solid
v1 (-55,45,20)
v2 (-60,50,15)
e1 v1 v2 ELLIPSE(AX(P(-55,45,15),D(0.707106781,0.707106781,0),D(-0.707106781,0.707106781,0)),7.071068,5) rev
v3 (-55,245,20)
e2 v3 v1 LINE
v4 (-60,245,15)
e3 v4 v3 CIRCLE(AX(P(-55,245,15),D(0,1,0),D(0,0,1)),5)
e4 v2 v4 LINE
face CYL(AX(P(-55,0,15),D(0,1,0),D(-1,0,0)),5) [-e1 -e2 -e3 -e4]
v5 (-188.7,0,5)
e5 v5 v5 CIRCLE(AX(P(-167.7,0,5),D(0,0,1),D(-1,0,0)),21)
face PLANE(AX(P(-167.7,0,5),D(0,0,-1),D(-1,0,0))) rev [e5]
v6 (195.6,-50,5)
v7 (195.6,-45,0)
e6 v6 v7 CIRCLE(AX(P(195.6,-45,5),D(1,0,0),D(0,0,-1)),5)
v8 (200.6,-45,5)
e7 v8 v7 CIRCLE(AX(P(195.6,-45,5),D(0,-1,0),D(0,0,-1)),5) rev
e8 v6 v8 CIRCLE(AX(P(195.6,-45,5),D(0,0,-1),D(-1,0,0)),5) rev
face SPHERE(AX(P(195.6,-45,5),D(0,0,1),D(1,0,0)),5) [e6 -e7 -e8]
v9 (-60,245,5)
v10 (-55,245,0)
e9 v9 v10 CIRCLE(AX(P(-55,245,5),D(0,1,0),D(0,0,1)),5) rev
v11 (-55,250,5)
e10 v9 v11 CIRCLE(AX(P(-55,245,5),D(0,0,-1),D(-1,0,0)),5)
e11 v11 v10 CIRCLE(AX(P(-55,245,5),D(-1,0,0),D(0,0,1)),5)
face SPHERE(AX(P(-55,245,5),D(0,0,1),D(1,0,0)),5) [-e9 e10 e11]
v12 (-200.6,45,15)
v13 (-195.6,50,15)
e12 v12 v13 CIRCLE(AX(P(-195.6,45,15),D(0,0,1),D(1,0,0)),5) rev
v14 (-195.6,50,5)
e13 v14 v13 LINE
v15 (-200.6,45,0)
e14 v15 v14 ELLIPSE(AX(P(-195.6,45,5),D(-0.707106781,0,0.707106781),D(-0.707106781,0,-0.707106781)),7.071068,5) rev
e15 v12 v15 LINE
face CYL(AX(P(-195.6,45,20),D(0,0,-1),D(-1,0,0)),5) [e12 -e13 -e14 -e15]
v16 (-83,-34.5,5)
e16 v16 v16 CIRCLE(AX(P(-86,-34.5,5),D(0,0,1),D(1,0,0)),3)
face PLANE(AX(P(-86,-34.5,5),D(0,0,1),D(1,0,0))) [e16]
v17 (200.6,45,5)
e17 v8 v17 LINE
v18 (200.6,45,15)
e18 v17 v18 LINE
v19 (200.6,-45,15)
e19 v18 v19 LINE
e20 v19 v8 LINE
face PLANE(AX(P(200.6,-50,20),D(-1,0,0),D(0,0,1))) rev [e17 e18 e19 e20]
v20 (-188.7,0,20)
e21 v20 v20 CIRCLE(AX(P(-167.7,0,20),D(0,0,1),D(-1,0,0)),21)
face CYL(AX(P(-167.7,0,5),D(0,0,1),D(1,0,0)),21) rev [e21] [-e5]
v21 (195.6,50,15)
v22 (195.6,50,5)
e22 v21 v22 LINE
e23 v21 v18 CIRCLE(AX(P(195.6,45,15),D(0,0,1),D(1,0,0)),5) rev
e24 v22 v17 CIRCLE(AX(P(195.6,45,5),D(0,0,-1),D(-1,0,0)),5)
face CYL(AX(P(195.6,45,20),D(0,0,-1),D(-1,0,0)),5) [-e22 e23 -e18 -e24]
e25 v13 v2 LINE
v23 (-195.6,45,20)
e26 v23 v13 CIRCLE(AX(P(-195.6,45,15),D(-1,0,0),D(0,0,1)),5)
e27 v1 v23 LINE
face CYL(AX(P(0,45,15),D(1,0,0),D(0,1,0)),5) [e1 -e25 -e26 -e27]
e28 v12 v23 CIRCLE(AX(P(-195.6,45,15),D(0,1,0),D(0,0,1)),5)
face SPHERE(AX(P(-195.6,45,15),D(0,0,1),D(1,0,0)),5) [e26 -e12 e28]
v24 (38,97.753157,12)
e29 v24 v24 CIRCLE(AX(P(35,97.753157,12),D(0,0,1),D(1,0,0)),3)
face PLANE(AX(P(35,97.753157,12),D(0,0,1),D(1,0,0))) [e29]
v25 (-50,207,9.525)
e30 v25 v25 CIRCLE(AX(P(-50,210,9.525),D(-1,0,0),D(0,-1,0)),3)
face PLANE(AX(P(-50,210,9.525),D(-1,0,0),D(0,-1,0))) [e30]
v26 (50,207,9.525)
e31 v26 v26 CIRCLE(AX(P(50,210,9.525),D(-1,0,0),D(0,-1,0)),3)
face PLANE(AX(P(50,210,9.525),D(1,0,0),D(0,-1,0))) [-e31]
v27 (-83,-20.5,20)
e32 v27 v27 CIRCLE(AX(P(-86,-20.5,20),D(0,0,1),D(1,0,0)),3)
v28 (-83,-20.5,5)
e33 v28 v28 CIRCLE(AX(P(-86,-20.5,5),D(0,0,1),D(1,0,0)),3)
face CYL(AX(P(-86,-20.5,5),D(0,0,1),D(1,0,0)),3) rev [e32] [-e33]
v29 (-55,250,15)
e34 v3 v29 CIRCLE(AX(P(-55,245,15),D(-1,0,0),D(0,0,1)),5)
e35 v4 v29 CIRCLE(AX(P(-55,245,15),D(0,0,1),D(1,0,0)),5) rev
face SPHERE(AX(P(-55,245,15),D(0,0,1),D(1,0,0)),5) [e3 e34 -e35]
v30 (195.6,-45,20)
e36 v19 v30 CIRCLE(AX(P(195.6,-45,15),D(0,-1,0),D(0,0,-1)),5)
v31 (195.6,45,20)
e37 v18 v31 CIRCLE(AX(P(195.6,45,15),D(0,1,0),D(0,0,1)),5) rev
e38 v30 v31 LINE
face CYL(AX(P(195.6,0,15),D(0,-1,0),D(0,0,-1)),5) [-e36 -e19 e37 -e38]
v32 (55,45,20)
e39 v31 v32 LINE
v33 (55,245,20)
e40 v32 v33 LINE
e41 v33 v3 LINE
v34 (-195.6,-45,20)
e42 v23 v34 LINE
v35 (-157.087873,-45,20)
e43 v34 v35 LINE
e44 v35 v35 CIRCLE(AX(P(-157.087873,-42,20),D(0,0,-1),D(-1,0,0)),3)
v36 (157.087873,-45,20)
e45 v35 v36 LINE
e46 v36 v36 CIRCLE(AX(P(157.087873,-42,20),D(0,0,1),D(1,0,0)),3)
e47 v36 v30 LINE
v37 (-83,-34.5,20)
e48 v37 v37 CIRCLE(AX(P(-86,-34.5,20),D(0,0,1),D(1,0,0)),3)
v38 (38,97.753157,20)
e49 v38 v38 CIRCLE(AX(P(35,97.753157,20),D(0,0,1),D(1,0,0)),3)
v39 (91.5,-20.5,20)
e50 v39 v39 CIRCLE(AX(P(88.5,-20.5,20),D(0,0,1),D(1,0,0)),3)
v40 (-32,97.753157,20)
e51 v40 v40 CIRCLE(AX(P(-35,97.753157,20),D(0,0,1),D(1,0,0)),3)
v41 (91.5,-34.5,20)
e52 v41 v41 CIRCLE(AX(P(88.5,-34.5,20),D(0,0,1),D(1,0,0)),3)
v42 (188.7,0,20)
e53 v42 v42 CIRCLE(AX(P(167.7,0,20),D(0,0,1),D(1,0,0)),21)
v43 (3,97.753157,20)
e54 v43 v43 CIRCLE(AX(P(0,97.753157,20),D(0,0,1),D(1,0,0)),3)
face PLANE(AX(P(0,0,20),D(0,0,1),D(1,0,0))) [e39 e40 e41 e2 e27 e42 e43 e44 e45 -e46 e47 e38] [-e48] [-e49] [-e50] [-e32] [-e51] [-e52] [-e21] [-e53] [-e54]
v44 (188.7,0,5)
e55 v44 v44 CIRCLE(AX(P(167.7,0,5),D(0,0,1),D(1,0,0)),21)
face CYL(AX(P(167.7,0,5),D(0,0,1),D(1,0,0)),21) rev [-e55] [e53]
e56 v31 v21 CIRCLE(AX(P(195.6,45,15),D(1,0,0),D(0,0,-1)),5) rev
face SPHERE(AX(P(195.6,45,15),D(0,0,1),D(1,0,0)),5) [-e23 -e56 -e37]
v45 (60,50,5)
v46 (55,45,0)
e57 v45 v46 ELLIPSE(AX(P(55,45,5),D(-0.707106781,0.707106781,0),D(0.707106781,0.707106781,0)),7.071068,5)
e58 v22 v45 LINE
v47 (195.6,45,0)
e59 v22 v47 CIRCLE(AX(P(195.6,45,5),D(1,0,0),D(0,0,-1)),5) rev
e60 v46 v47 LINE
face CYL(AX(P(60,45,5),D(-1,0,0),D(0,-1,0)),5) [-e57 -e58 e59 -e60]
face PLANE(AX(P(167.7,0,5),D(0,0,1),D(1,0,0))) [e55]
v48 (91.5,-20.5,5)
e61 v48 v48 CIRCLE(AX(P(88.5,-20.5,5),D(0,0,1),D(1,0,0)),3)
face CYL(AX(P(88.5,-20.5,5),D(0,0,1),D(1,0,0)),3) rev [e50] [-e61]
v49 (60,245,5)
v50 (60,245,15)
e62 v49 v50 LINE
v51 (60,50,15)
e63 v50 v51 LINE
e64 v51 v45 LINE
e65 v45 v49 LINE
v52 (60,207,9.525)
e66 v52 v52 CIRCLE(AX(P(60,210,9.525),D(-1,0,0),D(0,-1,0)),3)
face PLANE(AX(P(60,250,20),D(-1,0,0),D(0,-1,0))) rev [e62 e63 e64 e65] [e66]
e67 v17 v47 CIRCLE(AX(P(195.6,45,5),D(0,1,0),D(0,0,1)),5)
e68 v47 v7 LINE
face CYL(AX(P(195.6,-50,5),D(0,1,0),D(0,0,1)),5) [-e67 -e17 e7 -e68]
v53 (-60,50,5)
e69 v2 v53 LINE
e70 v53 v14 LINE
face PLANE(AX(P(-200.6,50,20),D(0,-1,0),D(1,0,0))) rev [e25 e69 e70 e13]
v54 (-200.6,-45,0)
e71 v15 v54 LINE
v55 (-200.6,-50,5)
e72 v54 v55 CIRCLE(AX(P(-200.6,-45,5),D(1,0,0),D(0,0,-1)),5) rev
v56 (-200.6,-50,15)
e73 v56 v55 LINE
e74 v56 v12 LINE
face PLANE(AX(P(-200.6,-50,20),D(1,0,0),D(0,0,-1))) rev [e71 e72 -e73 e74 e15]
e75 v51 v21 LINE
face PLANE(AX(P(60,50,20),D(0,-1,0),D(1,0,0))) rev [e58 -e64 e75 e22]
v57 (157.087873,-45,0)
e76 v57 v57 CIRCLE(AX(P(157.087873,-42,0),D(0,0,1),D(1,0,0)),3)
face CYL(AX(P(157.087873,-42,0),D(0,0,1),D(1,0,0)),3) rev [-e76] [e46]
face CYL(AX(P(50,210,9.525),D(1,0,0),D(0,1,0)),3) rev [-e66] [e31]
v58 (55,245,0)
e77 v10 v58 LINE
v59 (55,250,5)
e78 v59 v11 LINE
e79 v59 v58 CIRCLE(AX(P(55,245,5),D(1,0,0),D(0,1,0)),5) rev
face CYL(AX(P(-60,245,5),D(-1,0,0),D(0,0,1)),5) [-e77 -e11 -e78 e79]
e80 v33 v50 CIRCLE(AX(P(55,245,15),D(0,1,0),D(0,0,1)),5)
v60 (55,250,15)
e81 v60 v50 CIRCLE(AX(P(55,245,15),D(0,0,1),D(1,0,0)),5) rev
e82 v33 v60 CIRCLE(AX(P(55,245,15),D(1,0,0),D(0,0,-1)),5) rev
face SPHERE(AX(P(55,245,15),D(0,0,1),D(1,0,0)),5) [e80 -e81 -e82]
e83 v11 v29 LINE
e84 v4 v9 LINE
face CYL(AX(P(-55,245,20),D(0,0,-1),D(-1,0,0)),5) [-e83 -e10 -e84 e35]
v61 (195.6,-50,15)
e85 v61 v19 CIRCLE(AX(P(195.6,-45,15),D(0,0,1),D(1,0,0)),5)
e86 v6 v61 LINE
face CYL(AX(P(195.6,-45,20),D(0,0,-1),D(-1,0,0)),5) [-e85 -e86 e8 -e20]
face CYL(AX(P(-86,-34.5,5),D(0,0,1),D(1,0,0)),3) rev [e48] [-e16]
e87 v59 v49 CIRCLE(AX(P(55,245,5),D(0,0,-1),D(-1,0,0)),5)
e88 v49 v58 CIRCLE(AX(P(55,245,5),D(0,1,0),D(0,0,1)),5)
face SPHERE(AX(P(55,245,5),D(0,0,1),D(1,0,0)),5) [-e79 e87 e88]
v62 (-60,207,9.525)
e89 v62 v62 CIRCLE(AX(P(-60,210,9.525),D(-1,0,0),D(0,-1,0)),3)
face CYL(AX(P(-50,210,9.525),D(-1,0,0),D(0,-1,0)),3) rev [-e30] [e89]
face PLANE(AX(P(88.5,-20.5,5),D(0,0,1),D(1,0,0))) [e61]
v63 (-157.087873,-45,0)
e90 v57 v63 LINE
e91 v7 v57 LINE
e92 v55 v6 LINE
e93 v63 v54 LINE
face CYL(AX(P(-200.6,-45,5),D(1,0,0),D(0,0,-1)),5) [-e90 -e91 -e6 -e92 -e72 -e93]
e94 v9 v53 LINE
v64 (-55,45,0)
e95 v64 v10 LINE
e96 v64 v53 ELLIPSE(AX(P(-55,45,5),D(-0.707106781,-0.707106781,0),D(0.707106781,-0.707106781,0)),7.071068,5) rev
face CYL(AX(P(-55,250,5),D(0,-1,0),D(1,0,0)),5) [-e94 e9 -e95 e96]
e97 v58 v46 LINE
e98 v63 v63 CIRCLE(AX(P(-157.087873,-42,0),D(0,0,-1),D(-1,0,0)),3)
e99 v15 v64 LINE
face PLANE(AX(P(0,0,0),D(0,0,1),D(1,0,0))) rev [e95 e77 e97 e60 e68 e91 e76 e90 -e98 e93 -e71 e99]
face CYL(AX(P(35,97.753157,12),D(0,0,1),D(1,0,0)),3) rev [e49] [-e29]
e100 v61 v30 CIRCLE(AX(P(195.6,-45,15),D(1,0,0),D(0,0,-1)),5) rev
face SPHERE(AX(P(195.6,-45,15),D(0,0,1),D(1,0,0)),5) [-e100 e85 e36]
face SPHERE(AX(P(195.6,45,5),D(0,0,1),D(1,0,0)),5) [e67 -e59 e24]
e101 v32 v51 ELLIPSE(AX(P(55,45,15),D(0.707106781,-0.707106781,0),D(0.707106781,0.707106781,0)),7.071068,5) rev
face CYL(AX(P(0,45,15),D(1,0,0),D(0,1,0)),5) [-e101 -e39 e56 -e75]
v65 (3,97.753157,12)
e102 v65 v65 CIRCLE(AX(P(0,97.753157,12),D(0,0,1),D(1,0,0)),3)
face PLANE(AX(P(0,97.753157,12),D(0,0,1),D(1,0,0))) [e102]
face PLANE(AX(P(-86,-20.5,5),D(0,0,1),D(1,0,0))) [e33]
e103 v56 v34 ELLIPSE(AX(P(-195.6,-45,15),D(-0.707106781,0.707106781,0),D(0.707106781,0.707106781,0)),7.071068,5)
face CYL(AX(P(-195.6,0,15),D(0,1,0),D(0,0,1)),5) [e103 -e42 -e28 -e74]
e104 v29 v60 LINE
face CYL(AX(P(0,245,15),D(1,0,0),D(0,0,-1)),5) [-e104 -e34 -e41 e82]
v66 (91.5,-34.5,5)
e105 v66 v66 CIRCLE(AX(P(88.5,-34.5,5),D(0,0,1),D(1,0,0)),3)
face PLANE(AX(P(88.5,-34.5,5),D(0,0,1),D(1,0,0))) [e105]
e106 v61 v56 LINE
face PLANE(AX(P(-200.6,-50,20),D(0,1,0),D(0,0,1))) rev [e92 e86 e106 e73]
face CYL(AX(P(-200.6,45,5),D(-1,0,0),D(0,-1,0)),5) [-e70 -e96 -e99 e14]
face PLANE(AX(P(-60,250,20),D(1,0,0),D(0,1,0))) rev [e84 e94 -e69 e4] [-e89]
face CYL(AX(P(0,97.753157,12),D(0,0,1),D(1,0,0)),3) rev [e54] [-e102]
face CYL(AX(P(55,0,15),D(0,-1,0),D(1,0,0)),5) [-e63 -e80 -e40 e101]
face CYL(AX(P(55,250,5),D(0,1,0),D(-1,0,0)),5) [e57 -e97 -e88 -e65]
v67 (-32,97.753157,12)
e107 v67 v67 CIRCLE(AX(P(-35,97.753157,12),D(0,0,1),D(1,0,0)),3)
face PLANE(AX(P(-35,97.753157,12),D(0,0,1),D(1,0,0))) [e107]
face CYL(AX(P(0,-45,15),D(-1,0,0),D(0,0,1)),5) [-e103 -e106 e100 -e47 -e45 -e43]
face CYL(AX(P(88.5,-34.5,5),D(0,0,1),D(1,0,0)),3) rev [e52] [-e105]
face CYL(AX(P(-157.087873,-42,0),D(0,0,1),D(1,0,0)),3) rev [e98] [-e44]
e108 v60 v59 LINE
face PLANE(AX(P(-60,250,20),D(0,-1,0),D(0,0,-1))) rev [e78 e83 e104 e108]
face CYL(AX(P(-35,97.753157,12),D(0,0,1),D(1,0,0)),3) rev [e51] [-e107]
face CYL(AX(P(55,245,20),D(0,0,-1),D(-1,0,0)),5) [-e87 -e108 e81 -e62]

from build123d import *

# Parameters (mm, degrees)
BOSS_EXTRUDE1_DEPTH = 20
SKETCH2_R           = 21
CUT_EXTRUDE1_DEPTH  = 15
SKETCH3_R           = 3
CUT_EXTRUDE2_DEPTH  = 8
SKETCH4_R           = 3
CUT_EXTRUDE3_DEPTH  = 15
SKETCH5_R           = 3
CUT_EXTRUDE4_DEPTH  = 20
FILLET1_R           = 5
SKETCH6_R           = 3
CUT_EXTRUDE7_DEPTH  = 10


with BuildPart() as part:
    # Sketch1 → Boss-Extrude1 (new body)
    with BuildSketch(Plane.XY):
        Polygon((-200.6, -50), (200.6, -50), (200.6, 50), (60, 50), (60, 250), (-60, 250), (-60, 50), (-200.6, 50), align=None)
    extrude(amount=BOSS_EXTRUDE1_DEPTH)

    # Sketch2 → Cut-Extrude1 (cut)
    with BuildSketch(Plane.XY.offset(20)):
        with Locations((167.7, 0)):
            Circle(SKETCH2_R)
        with Locations(Location((-167.7, 0, 0), (0, 0, 180))):
            Circle(SKETCH2_R)
    extrude(amount=-CUT_EXTRUDE1_DEPTH, mode=Mode.SUBTRACT)

    # Sketch3 → Cut-Extrude2 (cut)
    with BuildSketch(Plane.XY.offset(20)):
        with Locations((-35, 97.753157488)):
            Circle(SKETCH3_R)
        with Locations((35, 97.753157488)):
            Circle(SKETCH3_R)
        with Locations((0, 97.753157488)):
            Circle(SKETCH3_R)
    extrude(amount=-CUT_EXTRUDE2_DEPTH, mode=Mode.SUBTRACT)

    # Sketch4 → Cut-Extrude3 (cut)
    with BuildSketch(Plane.XY.offset(20)):
        with Locations((-86, -20.5)):
            Circle(SKETCH4_R)
        with Locations((88.5, -20.5)):
            Circle(SKETCH4_R)
        with Locations((88.5, -34.5)):
            Circle(SKETCH4_R)
        with Locations((-86, -34.5)):
            Circle(SKETCH4_R)
    extrude(amount=-CUT_EXTRUDE3_DEPTH, mode=Mode.SUBTRACT)

    # Sketch5 → Cut-Extrude4 (cut)
    with BuildSketch(Plane.XY.offset(20)):
        with Locations((157.08787293, -42)):
            Circle(SKETCH5_R)
    cut_extrude4 = extrude(amount=-CUT_EXTRUDE4_DEPTH, mode=Mode.SUBTRACT)

    # Mirror2: Cut-Extrude4 across plane
    add(cut_extrude4.mirror(Plane(origin=(0, 0, 0), x_dir=(0, 0, 1), z_dir=(1, 0, 0))), mode=Mode.SUBTRACT)

    # Fillet1
    fillet1_edges = [part.edges().sort_by_distance(p)[0] for p in [
        (-60, 150, 0),
        (0, 250, 0),
        (60, 150, 0),
        (130.3, 50, 0),
        (0, 250, 20),
        (200.6, 50, 10),
        (200.6, -50, 10),
        (-200.6, 50, 10),
        (-60, 250, 10),
        (60, 250, 10),
        (-60, 150, 20),
        (-130.3, 50, 20),
        (-200.6, 0, 20),
        (0, -50, 20),
        (200.6, 0, 20),
        (130.3, 50, 20),
        (200.6, 0, 0),
        (60, 150, 20),
        (0, -50, 0),
        (-130.3, 50, 0),
    ]]
    fillet(fillet1_edges, radius=FILLET1_R - 0.0001)  # a hair under: the kernel refuses the full size

    # Sketch6 → Cut-Extrude7 (cut)
    with BuildSketch(Plane.ZY.offset(60)):
        with Locations(Location((9.525, 210, 0), (0, 0, 270))):
            Circle(SKETCH6_R)
    cut_extrude7 = extrude(amount=-CUT_EXTRUDE7_DEPTH, mode=Mode.SUBTRACT)

    # Mirror3: Cut-Extrude7 across plane
    add(cut_extrude7.mirror(Plane(origin=(0, 0, 0), x_dir=(0, 0, 1), z_dir=(1, 0, 0))), mode=Mode.SUBTRACT)


solid = part.part
